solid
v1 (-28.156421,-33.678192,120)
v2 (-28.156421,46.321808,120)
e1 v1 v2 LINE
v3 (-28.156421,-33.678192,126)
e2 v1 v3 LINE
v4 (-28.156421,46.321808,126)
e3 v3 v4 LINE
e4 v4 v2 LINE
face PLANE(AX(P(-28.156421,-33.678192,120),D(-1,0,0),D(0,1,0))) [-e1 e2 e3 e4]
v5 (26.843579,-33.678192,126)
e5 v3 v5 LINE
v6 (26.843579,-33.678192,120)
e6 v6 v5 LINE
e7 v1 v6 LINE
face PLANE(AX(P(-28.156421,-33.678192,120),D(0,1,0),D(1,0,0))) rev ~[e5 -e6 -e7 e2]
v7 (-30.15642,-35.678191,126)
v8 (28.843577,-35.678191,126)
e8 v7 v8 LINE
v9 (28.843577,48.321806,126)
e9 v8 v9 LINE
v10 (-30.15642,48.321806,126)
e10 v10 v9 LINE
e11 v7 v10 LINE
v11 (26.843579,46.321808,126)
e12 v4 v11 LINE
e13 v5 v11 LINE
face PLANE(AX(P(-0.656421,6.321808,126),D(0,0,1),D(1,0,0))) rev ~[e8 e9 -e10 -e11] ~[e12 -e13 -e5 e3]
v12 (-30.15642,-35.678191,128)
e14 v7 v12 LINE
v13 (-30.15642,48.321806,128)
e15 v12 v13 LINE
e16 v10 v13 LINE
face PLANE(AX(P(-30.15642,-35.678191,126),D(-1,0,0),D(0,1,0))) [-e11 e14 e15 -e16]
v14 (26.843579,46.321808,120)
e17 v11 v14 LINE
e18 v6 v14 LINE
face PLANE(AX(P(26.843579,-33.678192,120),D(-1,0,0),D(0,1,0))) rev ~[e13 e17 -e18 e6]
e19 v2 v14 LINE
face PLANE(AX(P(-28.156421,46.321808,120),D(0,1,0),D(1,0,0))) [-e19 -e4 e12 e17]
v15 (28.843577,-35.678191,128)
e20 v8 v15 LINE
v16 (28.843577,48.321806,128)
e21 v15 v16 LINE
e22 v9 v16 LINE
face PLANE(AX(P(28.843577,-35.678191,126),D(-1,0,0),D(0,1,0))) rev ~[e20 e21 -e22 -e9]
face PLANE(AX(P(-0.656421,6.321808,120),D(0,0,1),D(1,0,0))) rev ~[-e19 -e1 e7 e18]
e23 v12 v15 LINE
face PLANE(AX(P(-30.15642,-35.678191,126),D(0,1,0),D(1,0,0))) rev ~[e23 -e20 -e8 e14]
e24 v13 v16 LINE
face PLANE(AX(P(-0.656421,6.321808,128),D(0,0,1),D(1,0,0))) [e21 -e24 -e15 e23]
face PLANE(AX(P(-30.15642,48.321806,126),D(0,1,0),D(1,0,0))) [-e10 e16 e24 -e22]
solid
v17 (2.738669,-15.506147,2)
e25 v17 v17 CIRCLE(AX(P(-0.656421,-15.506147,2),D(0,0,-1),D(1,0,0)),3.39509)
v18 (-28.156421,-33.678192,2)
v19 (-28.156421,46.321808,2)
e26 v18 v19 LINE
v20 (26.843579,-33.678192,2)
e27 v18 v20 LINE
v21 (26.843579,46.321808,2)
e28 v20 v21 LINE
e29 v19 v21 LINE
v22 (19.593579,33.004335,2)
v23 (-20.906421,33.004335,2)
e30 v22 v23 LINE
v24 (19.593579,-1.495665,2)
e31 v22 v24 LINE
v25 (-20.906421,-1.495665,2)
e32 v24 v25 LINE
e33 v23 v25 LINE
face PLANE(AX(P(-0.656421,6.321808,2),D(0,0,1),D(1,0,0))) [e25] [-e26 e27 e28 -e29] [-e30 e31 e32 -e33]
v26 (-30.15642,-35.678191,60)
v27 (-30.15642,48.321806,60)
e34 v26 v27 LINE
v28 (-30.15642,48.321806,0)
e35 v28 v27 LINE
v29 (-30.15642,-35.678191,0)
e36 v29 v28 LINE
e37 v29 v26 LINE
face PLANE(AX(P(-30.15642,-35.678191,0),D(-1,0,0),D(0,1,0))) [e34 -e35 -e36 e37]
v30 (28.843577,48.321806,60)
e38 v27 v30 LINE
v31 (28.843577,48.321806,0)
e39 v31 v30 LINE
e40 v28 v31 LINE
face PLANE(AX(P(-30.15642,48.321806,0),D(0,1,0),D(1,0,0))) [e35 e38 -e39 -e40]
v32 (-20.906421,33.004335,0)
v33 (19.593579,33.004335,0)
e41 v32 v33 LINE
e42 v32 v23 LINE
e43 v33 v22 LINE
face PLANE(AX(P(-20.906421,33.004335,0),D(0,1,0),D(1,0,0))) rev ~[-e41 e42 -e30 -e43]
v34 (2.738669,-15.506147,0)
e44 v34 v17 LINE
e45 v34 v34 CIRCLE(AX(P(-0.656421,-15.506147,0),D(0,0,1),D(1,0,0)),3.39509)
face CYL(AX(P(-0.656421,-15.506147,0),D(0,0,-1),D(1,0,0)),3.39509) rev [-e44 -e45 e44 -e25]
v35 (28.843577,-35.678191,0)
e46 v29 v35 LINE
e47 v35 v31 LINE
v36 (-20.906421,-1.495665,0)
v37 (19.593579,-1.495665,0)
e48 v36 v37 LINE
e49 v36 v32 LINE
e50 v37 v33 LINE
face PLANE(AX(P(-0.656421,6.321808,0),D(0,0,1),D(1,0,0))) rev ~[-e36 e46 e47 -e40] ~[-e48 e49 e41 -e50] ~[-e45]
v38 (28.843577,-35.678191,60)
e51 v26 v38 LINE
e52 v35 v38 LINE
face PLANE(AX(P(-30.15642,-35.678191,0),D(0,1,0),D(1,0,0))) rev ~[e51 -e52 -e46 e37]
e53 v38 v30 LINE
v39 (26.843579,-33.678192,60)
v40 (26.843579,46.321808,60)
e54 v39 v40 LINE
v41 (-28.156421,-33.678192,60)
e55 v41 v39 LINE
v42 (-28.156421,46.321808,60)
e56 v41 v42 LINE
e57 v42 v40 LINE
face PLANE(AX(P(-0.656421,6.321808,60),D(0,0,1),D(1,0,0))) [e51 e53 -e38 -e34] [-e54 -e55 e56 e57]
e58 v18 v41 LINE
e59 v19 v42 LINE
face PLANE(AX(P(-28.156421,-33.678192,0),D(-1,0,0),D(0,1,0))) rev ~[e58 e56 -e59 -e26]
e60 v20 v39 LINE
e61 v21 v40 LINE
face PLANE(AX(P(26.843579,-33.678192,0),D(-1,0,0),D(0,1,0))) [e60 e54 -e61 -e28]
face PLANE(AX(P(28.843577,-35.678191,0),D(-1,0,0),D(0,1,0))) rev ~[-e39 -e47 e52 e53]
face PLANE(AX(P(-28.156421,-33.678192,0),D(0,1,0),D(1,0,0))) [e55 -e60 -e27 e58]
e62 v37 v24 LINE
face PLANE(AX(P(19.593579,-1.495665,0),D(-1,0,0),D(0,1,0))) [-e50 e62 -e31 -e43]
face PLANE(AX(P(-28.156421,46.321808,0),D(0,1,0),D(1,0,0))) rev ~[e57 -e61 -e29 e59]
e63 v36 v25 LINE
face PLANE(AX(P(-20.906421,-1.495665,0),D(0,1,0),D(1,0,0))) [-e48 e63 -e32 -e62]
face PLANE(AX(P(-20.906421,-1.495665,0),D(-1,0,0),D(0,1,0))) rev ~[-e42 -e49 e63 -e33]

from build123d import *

# Parameters (mm, degrees)
F0_W      = 55
F0_H      = 80
F1_DEPTH  = 2
F0_W_2    = 58.9999967363
F0_H_2    = 83.9999967363
F2_DEPTH  = 60
F3_START  = 120
F1_FACE_W = 55
F1_FACE_H = 80
F3_DEPTH  = 6
F4_START  = 126
F4_DEPTH  = 2
F5_R      = 3.395090495
F5_W      = 40.5
F5_H      = 34.5
F6_DEPTH  = 16.7


# Not quite as in the source:
# - a feature names something its author has since deleted; it is built from what else it names


with BuildPart() as f1:
    # F0 (on Top) → F1 (new body)
    with BuildSketch(Plane.XY):
        with Locations((-0.6564213149, 6.3218075262)):
            Rectangle(F0_W, F0_H)
    extrude(amount=F1_DEPTH)

    # F0 (on Top) → F2 (join)
    with BuildSketch(Plane.XY):
        with Locations((-0.6564213149, 6.3218075262)):
            Rectangle(F0_W_2, F0_H_2)
        with Locations((-0.6564213149, 6.3218075262)):
            Rectangle(F0_W, F0_H, mode=Mode.SUBTRACT)
    extrude(amount=F2_DEPTH)

    # F5 (on face) → F6 (cut)
    with BuildSketch(Plane.XY):
        with Locations((-0.6564213149, -15.506147407)):
            Circle(F5_R)
        with Locations((-0.6564213149, 15.7543346533)):
            Rectangle(F5_W, F5_H)
    extrude(amount=F6_DEPTH, mode=Mode.SUBTRACT)


with BuildPart() as f3:
    # F1_face (on face) + F0 (on Top) → F3 (new body)
    with BuildSketch(Plane(origin=(-0.6564213149, 6.3218075262, 2), x_dir=(1, 0, 0), z_dir=(0, 0, 1)).offset(F3_START)):
        Rectangle(F1_FACE_W, F1_FACE_H)
    with BuildSketch(Plane.XY.offset(F3_START)):
        with Locations((-0.6564213149, 6.3218075262)):
            Rectangle(F0_W, F0_H)
    extrude(amount=F3_DEPTH)

    # F0 (on Top) → F4 (join)
    with BuildSketch(Plane.XY.offset(F4_START)):
        with Locations((-0.6564213149, 6.3218075262)):
            Rectangle(F0_W_2, F0_H_2)
        with Locations((-0.6564213149, 6.3218075262)):
            Rectangle(F0_W, F0_H, mode=Mode.SUBTRACT)
    extrude(amount=F4_DEPTH)


solid = Compound([f1.part, f3.part])
